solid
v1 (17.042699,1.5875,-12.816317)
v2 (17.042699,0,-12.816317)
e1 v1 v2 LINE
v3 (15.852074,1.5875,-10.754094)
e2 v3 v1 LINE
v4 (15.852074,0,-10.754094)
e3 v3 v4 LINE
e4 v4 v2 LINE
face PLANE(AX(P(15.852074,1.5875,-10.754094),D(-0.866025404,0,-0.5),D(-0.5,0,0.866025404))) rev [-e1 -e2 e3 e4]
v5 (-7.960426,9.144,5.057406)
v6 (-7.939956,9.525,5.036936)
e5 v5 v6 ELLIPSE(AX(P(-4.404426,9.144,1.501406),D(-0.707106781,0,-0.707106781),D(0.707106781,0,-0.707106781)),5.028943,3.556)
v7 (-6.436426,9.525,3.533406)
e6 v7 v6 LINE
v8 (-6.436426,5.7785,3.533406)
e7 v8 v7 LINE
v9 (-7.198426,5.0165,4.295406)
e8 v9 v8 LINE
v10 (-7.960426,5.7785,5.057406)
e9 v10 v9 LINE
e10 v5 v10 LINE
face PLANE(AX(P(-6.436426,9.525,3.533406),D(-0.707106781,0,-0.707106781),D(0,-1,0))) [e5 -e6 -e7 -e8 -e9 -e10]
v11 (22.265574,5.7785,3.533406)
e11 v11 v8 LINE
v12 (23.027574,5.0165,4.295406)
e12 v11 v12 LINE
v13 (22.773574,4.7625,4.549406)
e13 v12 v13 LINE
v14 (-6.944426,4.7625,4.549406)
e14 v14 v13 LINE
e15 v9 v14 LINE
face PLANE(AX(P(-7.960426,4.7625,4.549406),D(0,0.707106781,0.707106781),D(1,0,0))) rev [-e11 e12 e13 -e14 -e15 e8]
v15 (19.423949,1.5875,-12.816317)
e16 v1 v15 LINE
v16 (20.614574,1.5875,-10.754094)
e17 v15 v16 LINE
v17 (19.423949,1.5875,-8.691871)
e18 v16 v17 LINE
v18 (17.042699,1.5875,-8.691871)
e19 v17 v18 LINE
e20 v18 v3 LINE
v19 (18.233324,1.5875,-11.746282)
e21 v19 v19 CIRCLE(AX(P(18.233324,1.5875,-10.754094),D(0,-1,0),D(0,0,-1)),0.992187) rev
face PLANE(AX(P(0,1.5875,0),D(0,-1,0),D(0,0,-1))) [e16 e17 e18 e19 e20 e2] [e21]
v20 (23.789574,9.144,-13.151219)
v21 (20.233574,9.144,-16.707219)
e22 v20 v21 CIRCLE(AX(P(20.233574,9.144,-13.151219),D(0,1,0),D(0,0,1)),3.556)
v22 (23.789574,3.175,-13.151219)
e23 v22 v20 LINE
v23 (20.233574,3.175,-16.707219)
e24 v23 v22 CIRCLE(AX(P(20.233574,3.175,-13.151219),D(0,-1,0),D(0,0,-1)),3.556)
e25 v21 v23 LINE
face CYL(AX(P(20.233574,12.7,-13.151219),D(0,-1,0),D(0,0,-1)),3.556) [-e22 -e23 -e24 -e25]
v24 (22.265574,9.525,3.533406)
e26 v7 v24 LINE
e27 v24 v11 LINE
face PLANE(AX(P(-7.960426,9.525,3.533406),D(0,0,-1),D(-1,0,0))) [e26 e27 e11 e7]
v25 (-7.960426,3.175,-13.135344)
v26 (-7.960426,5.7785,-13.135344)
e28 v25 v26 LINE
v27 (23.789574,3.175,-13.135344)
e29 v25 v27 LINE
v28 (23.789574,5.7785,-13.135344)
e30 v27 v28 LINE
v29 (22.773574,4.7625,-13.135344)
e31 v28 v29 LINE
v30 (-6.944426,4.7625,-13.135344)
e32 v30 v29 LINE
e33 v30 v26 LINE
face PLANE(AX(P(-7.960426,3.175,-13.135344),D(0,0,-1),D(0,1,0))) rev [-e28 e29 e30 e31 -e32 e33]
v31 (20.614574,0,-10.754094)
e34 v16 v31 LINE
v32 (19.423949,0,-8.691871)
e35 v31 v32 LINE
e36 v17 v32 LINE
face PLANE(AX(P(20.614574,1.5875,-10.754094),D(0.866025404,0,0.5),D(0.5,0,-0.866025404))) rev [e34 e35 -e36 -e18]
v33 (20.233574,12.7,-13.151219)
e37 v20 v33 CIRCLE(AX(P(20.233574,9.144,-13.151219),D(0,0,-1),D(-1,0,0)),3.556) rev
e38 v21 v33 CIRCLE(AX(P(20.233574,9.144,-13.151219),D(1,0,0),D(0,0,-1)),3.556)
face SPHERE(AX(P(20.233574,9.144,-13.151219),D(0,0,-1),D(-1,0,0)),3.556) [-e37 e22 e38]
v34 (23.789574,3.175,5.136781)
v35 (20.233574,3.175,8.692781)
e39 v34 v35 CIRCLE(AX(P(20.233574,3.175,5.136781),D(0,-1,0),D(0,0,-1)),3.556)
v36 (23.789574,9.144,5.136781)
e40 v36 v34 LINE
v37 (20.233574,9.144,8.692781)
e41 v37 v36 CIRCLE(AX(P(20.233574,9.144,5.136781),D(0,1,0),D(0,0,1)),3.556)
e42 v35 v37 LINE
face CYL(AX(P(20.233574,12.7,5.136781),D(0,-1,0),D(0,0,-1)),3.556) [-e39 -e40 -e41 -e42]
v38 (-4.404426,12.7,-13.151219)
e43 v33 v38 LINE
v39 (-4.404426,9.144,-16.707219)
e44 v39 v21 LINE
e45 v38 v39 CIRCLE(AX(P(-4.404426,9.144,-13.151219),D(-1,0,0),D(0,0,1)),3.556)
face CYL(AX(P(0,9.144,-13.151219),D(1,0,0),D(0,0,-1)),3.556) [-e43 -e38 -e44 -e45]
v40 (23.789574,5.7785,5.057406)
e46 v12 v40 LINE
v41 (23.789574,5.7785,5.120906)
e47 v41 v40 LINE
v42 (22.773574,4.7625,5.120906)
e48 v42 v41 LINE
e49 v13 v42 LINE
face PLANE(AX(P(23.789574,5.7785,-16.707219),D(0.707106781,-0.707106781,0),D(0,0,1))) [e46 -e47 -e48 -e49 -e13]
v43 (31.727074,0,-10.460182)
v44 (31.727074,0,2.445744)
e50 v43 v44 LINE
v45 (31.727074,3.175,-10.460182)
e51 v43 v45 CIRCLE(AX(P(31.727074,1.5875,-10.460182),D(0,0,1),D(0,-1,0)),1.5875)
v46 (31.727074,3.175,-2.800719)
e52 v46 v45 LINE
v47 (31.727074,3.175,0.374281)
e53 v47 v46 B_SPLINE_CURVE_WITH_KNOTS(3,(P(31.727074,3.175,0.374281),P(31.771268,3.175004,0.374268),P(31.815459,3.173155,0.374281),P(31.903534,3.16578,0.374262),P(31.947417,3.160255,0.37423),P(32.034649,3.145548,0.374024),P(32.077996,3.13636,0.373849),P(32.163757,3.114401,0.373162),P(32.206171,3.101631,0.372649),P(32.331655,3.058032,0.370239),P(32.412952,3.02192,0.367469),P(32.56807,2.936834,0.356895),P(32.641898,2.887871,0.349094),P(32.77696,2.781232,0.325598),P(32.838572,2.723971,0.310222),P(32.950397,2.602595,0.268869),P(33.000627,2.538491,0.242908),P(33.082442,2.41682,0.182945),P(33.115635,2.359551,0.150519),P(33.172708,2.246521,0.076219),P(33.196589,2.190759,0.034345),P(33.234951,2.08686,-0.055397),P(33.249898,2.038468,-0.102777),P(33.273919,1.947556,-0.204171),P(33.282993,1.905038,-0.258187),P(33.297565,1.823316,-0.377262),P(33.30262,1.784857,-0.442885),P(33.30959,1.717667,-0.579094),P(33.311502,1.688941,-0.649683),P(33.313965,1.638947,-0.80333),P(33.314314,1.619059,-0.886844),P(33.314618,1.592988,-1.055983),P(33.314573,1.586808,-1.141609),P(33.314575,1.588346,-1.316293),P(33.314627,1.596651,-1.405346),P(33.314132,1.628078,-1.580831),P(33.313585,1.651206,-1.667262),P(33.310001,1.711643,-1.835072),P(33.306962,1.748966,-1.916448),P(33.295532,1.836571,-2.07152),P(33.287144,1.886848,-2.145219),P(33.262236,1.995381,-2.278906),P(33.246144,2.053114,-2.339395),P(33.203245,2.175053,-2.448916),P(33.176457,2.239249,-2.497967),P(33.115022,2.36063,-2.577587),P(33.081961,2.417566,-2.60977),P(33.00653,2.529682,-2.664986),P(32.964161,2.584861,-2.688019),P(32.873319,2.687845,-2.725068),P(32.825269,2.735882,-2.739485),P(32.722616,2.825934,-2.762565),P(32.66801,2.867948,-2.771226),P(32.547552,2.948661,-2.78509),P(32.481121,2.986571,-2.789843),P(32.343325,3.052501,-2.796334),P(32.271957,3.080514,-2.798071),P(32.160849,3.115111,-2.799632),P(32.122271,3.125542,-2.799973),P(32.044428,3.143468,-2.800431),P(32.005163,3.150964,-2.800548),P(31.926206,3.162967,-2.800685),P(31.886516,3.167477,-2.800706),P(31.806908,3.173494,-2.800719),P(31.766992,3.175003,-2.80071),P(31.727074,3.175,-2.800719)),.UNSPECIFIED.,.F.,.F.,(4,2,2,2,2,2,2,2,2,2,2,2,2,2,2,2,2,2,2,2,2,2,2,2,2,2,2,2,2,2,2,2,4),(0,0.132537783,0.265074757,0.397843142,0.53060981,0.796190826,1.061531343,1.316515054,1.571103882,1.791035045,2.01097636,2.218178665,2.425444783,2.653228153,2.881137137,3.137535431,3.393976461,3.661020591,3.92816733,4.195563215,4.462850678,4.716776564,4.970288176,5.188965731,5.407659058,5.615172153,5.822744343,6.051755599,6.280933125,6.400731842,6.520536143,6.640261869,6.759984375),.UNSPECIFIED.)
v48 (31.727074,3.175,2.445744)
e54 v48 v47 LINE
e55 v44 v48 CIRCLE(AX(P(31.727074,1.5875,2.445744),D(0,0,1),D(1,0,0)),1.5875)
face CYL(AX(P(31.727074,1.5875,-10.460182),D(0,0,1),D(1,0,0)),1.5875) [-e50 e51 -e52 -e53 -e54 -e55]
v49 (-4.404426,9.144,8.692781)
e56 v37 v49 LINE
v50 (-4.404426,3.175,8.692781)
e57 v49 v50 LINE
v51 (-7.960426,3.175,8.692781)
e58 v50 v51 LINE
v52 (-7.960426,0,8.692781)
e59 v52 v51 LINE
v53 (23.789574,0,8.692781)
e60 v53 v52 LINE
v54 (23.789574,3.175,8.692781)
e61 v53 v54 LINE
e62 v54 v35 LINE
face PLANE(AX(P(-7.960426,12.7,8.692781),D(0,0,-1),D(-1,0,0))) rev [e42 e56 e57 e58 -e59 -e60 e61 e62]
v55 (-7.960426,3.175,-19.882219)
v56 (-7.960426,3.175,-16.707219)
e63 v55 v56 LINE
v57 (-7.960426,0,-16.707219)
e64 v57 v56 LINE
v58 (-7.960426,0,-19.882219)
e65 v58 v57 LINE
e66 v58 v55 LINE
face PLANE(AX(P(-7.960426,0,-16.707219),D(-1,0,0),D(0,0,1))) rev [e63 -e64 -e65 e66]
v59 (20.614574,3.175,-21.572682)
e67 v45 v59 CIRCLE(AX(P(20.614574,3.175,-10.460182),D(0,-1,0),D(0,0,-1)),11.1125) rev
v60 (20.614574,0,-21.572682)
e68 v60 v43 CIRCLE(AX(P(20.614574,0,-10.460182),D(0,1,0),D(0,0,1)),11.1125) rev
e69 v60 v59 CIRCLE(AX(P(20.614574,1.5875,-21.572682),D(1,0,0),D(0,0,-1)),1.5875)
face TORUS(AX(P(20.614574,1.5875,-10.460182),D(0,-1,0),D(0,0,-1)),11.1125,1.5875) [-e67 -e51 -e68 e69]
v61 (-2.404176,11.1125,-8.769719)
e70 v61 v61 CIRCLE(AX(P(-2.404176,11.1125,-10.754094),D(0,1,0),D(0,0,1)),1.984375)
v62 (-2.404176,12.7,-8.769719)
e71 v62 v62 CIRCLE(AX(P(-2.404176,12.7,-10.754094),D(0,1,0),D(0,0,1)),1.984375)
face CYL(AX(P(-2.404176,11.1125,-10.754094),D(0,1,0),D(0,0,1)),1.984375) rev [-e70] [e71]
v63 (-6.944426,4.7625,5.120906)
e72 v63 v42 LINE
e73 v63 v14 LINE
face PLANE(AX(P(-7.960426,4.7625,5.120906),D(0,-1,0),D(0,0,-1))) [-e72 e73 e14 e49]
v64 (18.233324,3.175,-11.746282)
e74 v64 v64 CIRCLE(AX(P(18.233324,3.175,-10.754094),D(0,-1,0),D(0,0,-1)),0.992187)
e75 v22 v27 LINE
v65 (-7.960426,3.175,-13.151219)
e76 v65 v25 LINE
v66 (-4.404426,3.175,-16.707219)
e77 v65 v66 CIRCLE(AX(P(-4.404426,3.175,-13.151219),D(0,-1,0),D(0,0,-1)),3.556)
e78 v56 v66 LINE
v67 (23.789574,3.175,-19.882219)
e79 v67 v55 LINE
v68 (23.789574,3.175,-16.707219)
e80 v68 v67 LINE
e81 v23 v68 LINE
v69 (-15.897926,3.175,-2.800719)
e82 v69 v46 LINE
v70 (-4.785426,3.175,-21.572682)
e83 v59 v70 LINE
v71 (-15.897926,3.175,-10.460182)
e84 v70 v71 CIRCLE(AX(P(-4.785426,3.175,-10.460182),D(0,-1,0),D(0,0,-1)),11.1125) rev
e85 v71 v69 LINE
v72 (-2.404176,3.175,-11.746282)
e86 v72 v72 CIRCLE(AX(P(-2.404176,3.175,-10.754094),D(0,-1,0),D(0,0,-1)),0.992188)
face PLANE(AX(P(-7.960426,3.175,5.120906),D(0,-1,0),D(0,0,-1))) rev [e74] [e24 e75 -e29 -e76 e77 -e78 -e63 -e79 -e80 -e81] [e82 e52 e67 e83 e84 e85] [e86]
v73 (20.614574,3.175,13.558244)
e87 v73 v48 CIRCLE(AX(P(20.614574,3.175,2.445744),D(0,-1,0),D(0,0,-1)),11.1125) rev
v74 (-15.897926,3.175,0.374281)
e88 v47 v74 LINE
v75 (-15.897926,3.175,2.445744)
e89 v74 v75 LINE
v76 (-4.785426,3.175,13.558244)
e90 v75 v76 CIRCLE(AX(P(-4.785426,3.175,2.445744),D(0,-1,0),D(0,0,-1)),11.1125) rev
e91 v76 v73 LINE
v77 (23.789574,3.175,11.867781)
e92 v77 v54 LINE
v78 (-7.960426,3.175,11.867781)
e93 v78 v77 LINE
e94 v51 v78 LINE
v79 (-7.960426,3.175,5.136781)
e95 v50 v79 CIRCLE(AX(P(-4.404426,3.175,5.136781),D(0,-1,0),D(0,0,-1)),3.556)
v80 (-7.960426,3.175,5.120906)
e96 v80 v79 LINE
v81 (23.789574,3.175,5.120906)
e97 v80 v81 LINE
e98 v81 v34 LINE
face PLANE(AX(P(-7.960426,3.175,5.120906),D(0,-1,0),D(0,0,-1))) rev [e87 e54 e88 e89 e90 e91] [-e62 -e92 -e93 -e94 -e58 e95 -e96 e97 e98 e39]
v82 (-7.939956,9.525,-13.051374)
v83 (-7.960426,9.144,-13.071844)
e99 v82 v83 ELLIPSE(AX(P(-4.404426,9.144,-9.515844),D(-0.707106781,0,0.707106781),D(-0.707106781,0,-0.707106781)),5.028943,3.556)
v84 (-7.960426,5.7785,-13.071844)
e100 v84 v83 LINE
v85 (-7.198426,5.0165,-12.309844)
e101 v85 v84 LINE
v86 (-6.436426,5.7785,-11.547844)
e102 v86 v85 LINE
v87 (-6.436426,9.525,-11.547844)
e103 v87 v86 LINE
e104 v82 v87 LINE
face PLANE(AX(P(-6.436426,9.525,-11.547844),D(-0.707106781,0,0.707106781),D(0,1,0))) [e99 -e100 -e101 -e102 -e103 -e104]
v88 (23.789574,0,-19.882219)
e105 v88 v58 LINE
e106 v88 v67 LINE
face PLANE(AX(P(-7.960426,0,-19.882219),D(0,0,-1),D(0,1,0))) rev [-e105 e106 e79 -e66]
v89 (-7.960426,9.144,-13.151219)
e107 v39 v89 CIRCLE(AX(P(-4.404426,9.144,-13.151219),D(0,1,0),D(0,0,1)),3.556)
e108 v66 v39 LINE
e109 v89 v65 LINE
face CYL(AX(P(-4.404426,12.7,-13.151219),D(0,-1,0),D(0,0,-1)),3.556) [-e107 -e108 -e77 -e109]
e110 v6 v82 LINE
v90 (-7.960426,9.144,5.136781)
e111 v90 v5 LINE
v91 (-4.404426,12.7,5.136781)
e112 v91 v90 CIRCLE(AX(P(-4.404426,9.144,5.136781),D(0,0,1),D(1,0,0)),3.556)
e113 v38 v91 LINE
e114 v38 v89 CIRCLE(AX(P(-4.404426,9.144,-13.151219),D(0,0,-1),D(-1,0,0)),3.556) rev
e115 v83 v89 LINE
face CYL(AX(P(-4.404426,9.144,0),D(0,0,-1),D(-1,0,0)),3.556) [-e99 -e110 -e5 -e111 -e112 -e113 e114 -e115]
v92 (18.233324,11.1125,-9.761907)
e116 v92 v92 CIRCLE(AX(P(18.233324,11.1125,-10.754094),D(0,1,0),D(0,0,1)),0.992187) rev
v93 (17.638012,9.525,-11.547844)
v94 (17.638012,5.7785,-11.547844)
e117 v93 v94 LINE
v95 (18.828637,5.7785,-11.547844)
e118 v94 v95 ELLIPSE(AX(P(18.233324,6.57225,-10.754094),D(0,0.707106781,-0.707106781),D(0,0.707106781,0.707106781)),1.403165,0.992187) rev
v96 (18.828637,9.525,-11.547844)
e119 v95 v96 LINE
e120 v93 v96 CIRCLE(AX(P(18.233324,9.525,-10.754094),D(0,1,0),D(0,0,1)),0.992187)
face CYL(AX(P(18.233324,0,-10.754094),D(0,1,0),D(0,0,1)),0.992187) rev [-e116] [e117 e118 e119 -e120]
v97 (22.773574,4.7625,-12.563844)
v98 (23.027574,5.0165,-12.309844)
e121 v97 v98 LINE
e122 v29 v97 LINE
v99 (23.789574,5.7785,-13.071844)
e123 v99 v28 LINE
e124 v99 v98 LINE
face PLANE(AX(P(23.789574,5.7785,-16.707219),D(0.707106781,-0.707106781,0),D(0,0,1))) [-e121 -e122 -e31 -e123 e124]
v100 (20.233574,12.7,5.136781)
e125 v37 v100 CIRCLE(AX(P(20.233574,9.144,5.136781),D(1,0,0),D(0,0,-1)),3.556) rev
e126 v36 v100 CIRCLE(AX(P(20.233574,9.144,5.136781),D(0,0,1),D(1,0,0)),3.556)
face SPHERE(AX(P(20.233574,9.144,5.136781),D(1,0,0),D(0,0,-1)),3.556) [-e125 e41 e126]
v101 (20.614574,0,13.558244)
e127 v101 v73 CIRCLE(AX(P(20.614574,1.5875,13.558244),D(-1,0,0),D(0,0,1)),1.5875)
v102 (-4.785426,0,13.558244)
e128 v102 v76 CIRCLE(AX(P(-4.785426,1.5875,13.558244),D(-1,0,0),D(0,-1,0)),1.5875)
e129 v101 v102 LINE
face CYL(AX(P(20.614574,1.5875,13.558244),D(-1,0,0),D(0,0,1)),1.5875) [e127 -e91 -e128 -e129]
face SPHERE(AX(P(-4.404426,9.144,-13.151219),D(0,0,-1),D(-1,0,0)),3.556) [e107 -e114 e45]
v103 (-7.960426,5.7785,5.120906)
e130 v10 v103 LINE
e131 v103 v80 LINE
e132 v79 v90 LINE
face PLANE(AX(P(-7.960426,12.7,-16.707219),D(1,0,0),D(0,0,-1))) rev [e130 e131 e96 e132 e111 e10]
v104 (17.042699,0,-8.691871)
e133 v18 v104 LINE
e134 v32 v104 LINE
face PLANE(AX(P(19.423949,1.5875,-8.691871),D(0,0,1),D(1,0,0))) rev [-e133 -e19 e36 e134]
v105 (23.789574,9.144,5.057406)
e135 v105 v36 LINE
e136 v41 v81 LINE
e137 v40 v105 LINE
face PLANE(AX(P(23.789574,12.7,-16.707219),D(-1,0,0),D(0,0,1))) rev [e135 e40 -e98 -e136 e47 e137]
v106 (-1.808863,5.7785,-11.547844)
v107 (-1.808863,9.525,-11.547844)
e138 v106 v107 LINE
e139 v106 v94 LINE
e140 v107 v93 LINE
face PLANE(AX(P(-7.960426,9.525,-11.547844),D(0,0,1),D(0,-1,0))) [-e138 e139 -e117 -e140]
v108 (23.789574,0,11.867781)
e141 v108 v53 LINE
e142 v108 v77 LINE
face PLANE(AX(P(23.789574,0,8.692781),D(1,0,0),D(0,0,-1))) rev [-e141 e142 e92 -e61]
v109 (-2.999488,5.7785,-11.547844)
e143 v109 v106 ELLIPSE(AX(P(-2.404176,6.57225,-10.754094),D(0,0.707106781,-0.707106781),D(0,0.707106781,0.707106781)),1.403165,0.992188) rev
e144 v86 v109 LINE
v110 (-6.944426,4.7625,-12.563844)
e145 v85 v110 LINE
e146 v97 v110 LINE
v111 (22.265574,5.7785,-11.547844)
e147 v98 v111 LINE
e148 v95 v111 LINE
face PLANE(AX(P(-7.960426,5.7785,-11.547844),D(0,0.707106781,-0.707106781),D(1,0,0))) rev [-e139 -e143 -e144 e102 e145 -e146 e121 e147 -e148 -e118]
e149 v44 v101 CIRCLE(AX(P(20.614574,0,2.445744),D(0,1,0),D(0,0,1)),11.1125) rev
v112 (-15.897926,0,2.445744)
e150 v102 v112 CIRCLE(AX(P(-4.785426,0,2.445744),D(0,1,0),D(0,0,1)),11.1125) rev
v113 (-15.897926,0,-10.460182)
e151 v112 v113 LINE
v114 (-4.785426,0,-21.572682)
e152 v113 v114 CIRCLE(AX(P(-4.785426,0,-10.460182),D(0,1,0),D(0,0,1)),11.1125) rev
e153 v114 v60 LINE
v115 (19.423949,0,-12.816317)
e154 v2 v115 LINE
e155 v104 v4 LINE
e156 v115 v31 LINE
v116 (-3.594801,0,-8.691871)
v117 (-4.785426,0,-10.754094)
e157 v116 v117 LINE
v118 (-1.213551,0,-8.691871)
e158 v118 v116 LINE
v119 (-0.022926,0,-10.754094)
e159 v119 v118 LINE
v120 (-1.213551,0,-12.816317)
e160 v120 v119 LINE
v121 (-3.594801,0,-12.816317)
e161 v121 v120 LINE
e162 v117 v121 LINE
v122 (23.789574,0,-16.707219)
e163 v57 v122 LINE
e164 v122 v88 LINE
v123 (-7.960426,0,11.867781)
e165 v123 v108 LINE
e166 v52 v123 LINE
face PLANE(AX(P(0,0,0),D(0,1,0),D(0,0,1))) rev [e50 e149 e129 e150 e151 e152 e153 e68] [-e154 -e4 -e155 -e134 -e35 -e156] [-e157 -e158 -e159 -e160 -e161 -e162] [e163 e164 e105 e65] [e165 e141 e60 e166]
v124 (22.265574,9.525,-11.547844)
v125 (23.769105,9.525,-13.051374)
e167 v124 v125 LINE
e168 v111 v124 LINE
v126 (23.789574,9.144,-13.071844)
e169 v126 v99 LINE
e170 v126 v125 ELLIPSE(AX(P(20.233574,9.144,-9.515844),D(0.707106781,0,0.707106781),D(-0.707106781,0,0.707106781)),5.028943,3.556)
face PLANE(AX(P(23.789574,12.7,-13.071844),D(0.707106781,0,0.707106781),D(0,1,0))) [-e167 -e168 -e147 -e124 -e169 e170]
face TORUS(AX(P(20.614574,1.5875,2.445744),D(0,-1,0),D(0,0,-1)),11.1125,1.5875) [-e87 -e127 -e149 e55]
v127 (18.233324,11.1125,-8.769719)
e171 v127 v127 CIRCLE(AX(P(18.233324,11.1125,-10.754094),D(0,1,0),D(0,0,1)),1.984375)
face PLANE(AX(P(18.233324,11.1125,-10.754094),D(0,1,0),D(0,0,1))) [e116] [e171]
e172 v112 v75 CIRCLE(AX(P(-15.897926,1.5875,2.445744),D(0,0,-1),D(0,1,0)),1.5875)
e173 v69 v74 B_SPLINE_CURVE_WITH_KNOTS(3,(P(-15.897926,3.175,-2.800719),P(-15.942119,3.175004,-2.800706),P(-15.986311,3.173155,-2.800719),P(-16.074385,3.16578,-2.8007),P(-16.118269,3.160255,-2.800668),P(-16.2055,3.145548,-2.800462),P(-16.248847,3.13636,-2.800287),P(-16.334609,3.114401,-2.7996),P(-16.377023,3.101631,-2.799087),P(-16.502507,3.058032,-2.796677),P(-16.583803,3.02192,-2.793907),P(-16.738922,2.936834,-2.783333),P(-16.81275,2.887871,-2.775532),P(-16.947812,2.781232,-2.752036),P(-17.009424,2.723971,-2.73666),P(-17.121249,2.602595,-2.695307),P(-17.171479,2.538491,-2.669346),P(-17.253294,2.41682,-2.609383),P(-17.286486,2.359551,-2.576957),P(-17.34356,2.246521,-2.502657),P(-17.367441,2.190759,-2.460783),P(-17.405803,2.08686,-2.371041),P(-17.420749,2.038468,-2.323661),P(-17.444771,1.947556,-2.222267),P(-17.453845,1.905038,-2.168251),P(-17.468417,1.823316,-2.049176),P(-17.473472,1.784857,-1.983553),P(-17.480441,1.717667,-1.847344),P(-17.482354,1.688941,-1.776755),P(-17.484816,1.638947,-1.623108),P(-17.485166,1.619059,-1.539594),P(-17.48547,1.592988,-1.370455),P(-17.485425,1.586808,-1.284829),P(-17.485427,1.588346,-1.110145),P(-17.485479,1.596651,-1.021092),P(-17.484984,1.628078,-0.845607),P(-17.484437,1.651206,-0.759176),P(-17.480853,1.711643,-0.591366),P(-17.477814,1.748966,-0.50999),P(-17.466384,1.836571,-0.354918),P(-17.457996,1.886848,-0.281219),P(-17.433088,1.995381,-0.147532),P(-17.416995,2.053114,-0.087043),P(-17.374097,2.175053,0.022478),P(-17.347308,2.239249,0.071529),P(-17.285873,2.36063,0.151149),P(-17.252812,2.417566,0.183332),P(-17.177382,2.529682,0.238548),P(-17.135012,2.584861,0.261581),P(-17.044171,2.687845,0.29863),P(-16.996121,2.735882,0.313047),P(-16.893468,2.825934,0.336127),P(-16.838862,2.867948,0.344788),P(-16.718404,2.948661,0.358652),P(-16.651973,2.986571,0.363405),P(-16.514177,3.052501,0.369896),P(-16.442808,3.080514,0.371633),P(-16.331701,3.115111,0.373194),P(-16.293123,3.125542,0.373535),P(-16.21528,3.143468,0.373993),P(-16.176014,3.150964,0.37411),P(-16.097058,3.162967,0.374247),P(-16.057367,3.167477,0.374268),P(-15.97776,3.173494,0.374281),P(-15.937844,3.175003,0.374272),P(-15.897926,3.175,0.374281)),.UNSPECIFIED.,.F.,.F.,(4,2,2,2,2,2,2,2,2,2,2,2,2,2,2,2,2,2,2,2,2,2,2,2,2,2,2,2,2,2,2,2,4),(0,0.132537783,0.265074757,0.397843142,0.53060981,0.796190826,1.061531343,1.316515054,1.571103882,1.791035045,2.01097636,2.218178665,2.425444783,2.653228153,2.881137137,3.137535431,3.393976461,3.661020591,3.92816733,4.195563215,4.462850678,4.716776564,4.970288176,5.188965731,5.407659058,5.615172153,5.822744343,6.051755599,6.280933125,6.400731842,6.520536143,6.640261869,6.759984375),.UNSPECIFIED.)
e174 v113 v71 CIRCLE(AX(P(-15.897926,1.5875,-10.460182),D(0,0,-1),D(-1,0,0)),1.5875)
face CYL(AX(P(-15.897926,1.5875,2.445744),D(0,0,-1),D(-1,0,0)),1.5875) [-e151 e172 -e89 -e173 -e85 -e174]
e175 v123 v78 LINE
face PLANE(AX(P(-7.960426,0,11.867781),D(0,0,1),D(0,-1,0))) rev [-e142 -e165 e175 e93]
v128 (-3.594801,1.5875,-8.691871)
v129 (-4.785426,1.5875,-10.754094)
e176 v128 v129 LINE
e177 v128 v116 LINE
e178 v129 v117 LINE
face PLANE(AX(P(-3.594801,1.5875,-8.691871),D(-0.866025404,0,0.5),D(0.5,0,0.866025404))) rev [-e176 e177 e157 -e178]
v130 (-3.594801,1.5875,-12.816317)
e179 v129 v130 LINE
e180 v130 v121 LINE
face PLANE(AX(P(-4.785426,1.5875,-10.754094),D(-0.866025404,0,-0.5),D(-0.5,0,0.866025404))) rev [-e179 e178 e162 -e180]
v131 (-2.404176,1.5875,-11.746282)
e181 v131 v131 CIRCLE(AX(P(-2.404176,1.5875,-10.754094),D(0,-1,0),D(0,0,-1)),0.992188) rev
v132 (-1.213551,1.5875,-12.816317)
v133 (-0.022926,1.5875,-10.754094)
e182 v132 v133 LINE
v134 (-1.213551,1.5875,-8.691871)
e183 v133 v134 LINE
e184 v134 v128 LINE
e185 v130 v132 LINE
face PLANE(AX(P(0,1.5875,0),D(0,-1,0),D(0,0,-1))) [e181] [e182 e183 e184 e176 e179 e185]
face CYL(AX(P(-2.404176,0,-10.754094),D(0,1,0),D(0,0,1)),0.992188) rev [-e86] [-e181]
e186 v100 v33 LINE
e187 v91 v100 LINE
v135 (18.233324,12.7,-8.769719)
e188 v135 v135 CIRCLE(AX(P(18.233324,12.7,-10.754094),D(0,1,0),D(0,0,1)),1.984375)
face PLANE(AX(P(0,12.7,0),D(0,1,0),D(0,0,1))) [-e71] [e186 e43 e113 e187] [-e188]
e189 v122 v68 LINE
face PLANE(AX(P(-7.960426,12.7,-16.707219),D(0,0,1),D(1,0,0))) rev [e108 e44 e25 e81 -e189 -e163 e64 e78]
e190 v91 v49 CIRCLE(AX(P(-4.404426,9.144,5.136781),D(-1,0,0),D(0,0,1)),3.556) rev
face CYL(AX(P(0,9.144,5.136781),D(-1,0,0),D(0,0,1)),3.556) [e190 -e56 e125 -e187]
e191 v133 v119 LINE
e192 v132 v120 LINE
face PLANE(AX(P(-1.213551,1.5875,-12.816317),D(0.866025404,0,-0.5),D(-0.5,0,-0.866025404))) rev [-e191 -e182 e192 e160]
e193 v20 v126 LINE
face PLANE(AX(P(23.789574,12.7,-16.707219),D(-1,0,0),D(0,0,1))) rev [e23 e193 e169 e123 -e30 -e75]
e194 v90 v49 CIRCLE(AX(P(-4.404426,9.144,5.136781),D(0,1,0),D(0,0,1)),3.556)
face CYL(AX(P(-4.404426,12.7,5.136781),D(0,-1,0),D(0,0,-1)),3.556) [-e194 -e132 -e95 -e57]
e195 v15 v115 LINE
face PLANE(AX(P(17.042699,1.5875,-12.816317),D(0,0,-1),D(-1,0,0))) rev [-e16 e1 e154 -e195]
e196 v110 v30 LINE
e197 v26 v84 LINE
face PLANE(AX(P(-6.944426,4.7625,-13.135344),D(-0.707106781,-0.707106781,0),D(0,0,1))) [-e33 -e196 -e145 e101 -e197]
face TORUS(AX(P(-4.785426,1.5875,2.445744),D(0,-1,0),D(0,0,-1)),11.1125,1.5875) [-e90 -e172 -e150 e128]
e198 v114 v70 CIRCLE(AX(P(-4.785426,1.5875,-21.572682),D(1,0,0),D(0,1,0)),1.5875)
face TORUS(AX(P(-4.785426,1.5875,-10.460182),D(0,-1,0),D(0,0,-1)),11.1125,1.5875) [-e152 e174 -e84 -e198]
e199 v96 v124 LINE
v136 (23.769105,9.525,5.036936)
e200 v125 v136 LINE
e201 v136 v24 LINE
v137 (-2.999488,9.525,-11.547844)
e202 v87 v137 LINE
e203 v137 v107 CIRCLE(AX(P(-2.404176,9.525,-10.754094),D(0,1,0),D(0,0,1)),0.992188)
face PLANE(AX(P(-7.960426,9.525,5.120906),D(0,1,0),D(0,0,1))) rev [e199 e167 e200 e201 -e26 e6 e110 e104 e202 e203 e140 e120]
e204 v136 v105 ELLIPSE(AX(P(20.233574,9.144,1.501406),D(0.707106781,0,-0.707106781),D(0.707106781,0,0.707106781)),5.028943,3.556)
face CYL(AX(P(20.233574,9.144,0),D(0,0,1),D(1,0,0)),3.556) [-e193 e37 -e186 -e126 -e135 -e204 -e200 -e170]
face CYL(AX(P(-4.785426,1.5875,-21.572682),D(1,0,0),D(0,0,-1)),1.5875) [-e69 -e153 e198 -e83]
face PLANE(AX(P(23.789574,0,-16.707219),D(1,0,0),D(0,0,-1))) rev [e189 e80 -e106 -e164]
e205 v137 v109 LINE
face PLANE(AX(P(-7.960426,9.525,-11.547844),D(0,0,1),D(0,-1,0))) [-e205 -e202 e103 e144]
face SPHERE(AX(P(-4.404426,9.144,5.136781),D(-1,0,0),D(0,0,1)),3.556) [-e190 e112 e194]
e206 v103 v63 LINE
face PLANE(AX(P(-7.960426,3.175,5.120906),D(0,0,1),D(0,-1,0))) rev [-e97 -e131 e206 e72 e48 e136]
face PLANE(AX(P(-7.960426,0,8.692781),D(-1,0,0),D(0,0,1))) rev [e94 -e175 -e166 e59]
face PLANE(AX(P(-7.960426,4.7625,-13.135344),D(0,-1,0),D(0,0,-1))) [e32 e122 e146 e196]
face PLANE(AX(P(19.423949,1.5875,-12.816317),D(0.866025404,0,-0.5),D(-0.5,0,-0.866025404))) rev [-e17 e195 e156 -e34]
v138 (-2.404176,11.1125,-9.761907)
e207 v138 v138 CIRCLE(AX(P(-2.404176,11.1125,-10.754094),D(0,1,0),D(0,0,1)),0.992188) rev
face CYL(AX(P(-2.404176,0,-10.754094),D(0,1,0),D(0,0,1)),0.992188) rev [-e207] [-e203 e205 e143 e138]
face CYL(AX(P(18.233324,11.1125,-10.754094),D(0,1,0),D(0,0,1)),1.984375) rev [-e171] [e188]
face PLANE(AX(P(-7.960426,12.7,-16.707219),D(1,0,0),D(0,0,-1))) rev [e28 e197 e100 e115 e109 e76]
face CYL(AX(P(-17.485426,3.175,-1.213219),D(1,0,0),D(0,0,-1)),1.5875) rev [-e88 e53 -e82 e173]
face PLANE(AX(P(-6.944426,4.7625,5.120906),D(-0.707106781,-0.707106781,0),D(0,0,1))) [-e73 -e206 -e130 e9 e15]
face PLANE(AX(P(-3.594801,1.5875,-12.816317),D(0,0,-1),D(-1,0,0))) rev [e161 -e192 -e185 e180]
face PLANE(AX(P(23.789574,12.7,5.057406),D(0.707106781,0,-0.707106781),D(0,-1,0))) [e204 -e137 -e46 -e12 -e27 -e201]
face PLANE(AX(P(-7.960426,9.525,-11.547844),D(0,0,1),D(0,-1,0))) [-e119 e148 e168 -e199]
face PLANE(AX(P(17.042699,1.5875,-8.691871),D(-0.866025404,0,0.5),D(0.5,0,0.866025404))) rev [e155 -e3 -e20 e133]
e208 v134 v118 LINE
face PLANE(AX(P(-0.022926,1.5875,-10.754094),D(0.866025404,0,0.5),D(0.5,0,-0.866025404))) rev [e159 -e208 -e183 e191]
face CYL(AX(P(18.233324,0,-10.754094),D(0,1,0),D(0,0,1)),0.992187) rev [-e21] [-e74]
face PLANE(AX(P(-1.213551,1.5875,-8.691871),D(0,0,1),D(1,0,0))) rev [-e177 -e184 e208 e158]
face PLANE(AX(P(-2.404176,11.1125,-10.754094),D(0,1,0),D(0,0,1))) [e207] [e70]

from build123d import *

# Parameters (mm, degrees)
SKETCH1_W               = 31.75
SKETCH1_H               = 25.4
BOSS_EXTRUDE1_DEPTH     = 12.7
SKETCH2_W               = 18.25625
SKETCH2_H               = 6.35
CUT_EXTRUDE3_DEPTH      = 39.058949894
SKETCH4_W               = 1.5875
SKETCH4_H               = 4.7625
BOSS_EXTRUDE2_DEPTH     = 31.75
CUT_EXTRUDE5_DEPTH      = 31.590858593
CUT_EXTRUDE5_DEPTH_BACK = 31.590858593
SKETCH5_R               = 0.9921875
CUT_EXTRUDE6_DEPTH      = 1.5875
SKETCH7_R               = 1.984375
CUT_EXTRUDE7_DEPTH      = 1.5875
SKETCH8_W               = 50.8
SKETCH8_H               = 38.305926372
SKETCH8_W_2             = 31.75
SKETCH8_H_2             = 25.4
BOSS_EXTRUDE3_DEPTH     = 3.175
SKETCH10_W              = 31.75
SKETCH10_H              = 3.175
CUT_EXTRUDE8_DEPTH      = 42.677098196
FILLET6_R               = 12.7
CHAMFER1_SIZE           = 1.016
CHAMFER2_SIZE           = 1.524
FILLET7_R               = 3.556
FILLET10_R              = 1.5875
SKETCH13_R              = 1.5875
CUT_EXTRUDE9_DEPTH      = 74.216005252


# Some blends are built 0.0001 mm under size
with BuildPart() as part:
    # Sketch1 → Boss-Extrude1 (new body)
    with BuildSketch(Plane(origin=(0, 0, 0), x_dir=(1, 0, 0), z_dir=(0, 1, 0))):
        with Locations((7.914574134, 4.007219009)):
            Rectangle(SKETCH1_W, SKETCH1_H)
    extrude(amount=BOSS_EXTRUDE1_DEPTH)

    # Sketch2 → Cut-Extrude3 (cut, through all)
    with BuildSketch(Plane(origin=(23.789574134, 0, 0), x_dir=(0, 0, -1), z_dir=(1, 0, 0))):
        with Locations((4.007219009, 6.35)):
            Rectangle(SKETCH2_W, SKETCH2_H)
    extrude(amount=-CUT_EXTRUDE3_DEPTH, mode=Mode.SUBTRACT)

    # Sketch4 → Boss-Extrude2 (add, through all)
    with BuildSketch(Plane(origin=(23.789574134, 0, 0), x_dir=(0, 0, -1), z_dir=(1, 0, 0))):
        with Locations((-4.327155991, 7.14375)):
            Rectangle(SKETCH4_W, SKETCH4_H)
        with Locations((12.341594009, 7.14375)):
            Rectangle(SKETCH4_W, SKETCH4_H)
    extrude(amount=-BOSS_EXTRUDE2_DEPTH)

    # Sketch5 → Cut-Extrude5 (cut, two sides: drawn at the far end of the back side and taken through both)
    with BuildSketch(Plane(origin=(0, 3.175, 0), x_dir=(1, 0, 0), z_dir=(0, 1, 0)).offset(-CUT_EXTRUDE5_DEPTH_BACK)):
        with Locations(Location((-2.404175866, 10.754094009, 0), (0, 0, 270))):
            Circle(SKETCH5_R)
        with Locations(Location((18.233324134, 10.754094009, 0), (0, 0, 126.869897646))):
            Circle(SKETCH5_R)
    extrude(amount=CUT_EXTRUDE5_DEPTH + CUT_EXTRUDE5_DEPTH_BACK, mode=Mode.SUBTRACT)

    # Sketch6 → Cut-Extrude6 (cut)
    with BuildSketch(Plane.XZ):
        Polygon((-0.022925866, -10.754094009), (-1.213550866, -8.691871016), (-3.594800866, -8.691871016), (-4.785425866, -10.754094009), (-3.594800866, -12.816317002), (-1.213550866, -12.816317002), align=None)
        Polygon((20.614574134, -10.754094009), (19.423949134, -8.691871016), (17.042699134, -8.691871016), (15.852074134, -10.754094009), (17.042699134, -12.816317002), (19.423949134, -12.816317002), align=None)
    extrude(amount=-CUT_EXTRUDE6_DEPTH, mode=Mode.SUBTRACT)

    # Sketch7 → Cut-Extrude7 (cut)
    with BuildSketch(Plane(origin=(0, 12.7, 0), x_dir=(1, 0, 0), z_dir=(0, 1, 0))):
        with Locations(Location((-2.404175866, 10.754094009, 0), (0, 0, 270))):
            Circle(SKETCH7_R)
        with Locations(Location((18.233324134, 10.754094009, 0), (0, 0, 270))):
            Circle(SKETCH7_R)
    extrude(amount=-CUT_EXTRUDE7_DEPTH, mode=Mode.SUBTRACT)

    # Sketch8 → Boss-Extrude3 (add)
    with BuildSketch(Plane.XZ):
        with Locations((7.914574134, -4.007219009)):
            Rectangle(SKETCH8_W, SKETCH8_H)
        with Locations((7.914574134, -4.007219009)):
            Rectangle(SKETCH8_W_2, SKETCH8_H_2, mode=Mode.SUBTRACT)
    extrude(amount=-BOSS_EXTRUDE3_DEPTH)

    # Sketch10 → Cut-Extrude8 (cut, through all)
    with BuildSketch(Plane(origin=(0, 3.175, 0), x_dir=(1, 0, 0), z_dir=(0, 1, 0))):
        with Locations((7.914574134, 18.294719009)):
            Rectangle(SKETCH10_W, SKETCH10_H)
        with Locations((7.914574134, -10.280280991)):
            Rectangle(SKETCH10_W, SKETCH10_H)
    extrude(amount=-CUT_EXTRUDE8_DEPTH, mode=Mode.SUBTRACT)

    # Fillet6
    fillet6_edges = [part.edges().sort_by_distance(p)[0] for p in [
        (-17.485425866, 1.5875, 15.145744177),
        (33.314574134, 1.5875, 15.145744177),
        (33.314574134, 1.5875, -23.160182195),
        (-17.485425866, 1.5875, -23.160182195),
    ]]
    fillet(fillet6_edges, radius=FILLET6_R)

    # Chamfer1
    # the kernel refuses this chamfer: 1.016 mm, written as the material it takes off along each edge
    with BuildSketch(Plane(origin=(-7.960425866, 4.7625, 0.920576075), x_dir=(-0.027495876610586435, 0.9996219169112968, 0), z_dir=(0, 0, 1)), Plane(origin=(-7.960425866, 4.7625, -13.135344009), x_dir=(-0.027495876610586435, 0.9996219169112968, 1.1185418764848949e-15), z_dir=(0, 0, 1))) as chamfer1_piece_1:
        Polygon((CHAMFER1_SIZE * 0.999621916911, -CHAMFER1_SIZE * 0.0274958766106), (-CHAMFER1_SIZE * 0.0274958766106, -CHAMFER1_SIZE * 0.999621916911), (0, 0), align=None)
    extrude(amount=4.200329916, mode=Mode.SUBTRACT)
    with BuildSketch(Plane(origin=(26.402404049, 4.7625, 3.533405991), x_dir=(0, 0.9996219169112968, -0.027495876610586435), z_dir=(-1, 0, 0))) as chamfer1_piece_2:
        Polygon((CHAMFER1_SIZE * 0.999621916911, -CHAMFER1_SIZE * 0.0274958766106), (-CHAMFER1_SIZE * 0.0274958766106, -CHAMFER1_SIZE * 0.999621916911), (0, 0), align=None)
    extrude(amount=36.975659832, mode=Mode.SUBTRACT)
    with BuildSketch(Plane(origin=(23.789574134, 4.7625, 0.920576075), x_dir=(0.027495876610587285, 0.9996219169112968, 0), z_dir=(0, 0, 1)), Plane(origin=(23.789574134, 4.7625, -13.135344009), x_dir=(0.027495876610587285, 0.9996219169112968, 1.1185418764848949e-15), z_dir=(0, 0, 1))) as chamfer1_piece_3:
        Polygon((CHAMFER1_SIZE * 0.999621916911, CHAMFER1_SIZE * 0.0274958766106), (-CHAMFER1_SIZE * 0.0274958766106, CHAMFER1_SIZE * 0.999621916911), (0, 0), align=None)
    extrude(amount=4.200329916, mode=Mode.SUBTRACT)
    with BuildSketch(Plane(origin=(-0.386658451, 4.7625, -11.547844009), x_dir=(0, -0.027495876610585605, -0.9996219169112968), z_dir=(-1, 0, 0)), Plane(origin=(26.402404049, 4.7625, -11.547844009), x_dir=(0, -0.027495876610585605, -0.9996219169112968), z_dir=(-1, 0, 0))) as chamfer1_piece_4:
        Polygon((CHAMFER1_SIZE * 0.999621916911, -CHAMFER1_SIZE * 0.0274958766106), (-CHAMFER1_SIZE * 0.0274958766106, -CHAMFER1_SIZE * 0.999621916911), (0, 0), align=None)
    extrude(amount=10.186597332, mode=Mode.SUBTRACT)
    with BuildSketch(Plane(origin=(20.250841549, 4.7625, -11.547844009), x_dir=(0, -0.027495876610585605, -0.9996219169112968), z_dir=(-1, 0, 0))) as chamfer1_piece_5:
        Polygon((CHAMFER1_SIZE * 0.999621916911, -CHAMFER1_SIZE * 0.0274958766106), (-CHAMFER1_SIZE * 0.0274958766106, -CHAMFER1_SIZE * 0.999621916911), (0, 0), align=None)
    extrude(amount=24.672534832, mode=Mode.SUBTRACT)

    # Chamfer2
    chamfer2_edges = [part.edges().sort_by_distance(p)[0] for p in [
        (-7.960425866, 7.65175, 3.533405991),
        (23.789574134, 7.65175, 3.533405991),
        (-7.960425866, 7.65175, -11.547844009),
        (23.789574134, 7.65175, -11.547844009),
    ]]
    chamfer(chamfer2_edges, length=CHAMFER2_SIZE)

    # Fillet7
    # the kernel refuses this fillet: 3.556 mm, written as the material it takes off along each edge
    with BuildSketch(Plane(origin=(20.233574134, 9.144, 5.136780991), x_dir=(0, 0, 1), z_dir=(1, 0, 0))) as fillet7_piece_1_section:
        Polygon((0, 0), (FILLET7_R * 1.02, 0), (FILLET7_R * 1.02, -FILLET7_R * 1.02), (0, -FILLET7_R * 1.02), align=None)
    fillet7_piece_1 = extrude(amount=FILLET7_R * 1.02, mode=Mode.PRIVATE)
    fillet7_piece_1 = fillet7_piece_1 - Plane(origin=(20.233574134, 9.144, 5.136780991), x_dir=(0, -0.7071067811865475, -0.7071067811865475), z_dir=(1, 0, 0)) * Sphere(FILLET7_R, mode=Mode.PRIVATE)
    add(fillet7_piece_1, mode=Mode.SUBTRACT)
    with BuildSketch(Plane(origin=(-4.404425866, 9.144, 5.136780991), x_dir=(0, 0, 1), z_dir=(-1, 0, 0))) as fillet7_piece_2_section:
        Polygon((0, 0), (FILLET7_R * 1.02, 0), (FILLET7_R * 1.02, FILLET7_R * 1.02), (0, FILLET7_R * 1.02), align=None)
    fillet7_piece_2 = extrude(amount=FILLET7_R * 1.02, mode=Mode.PRIVATE)
    fillet7_piece_2 = fillet7_piece_2 - Plane(origin=(-4.404425866, 9.144, 5.136780991), x_dir=(0, -0.7071067811865475, -0.7071067811865475), z_dir=(-1, 0, 0)) * Sphere(FILLET7_R, mode=Mode.PRIVATE)
    add(fillet7_piece_2, mode=Mode.SUBTRACT)
    with BuildSketch(Plane(origin=(20.233574134, 9.144, -13.151219009), x_dir=(1, 0, 0), z_dir=(0, 0, -1))) as fillet7_piece_3_section:
        Polygon((0, 0), (FILLET7_R * 1.02, 0), (FILLET7_R * 1.02, -FILLET7_R * 1.02), (0, -FILLET7_R * 1.02), align=None)
    fillet7_piece_3 = extrude(amount=FILLET7_R * 1.02, mode=Mode.PRIVATE)
    fillet7_piece_3 = fillet7_piece_3 - Plane(origin=(20.233574134, 9.144, -13.151219009), x_dir=(-0.7071067811865475, -0.7071067811865475, 0), z_dir=(0, 0, -1)) * Sphere(FILLET7_R, mode=Mode.PRIVATE)
    add(fillet7_piece_3, mode=Mode.SUBTRACT)
    with BuildSketch(Plane(origin=(-4.404425866, 9.144, -13.151219009), x_dir=(-1, 0, 0), z_dir=(0, 0, -1))) as fillet7_piece_4_section:
        Polygon((0, 0), (FILLET7_R * 1.02, 0), (FILLET7_R * 1.02, FILLET7_R * 1.02), (0, FILLET7_R * 1.02), align=None)
    fillet7_piece_4 = extrude(amount=FILLET7_R * 1.02, mode=Mode.PRIVATE)
    fillet7_piece_4 = fillet7_piece_4 - Plane(origin=(-4.404425866, 9.144, -13.151219009), x_dir=(0.7071067811865475, -0.7071067811865475, 0), z_dir=(0, 0, -1)) * Sphere(FILLET7_R, mode=Mode.PRIVATE)
    add(fillet7_piece_4, mode=Mode.SUBTRACT)
    with BuildSketch(Plane(origin=(20.233574134, 12.7, 8.692780991), x_dir=(0, -1, 0), z_dir=(-1, 0, 0))) as fillet7_piece_5:
        with BuildLine():
            CenterArc((FILLET7_R, -FILLET7_R), FILLET7_R, 90, 90)
            Line((0, -FILLET7_R), (0, 0))
            Line((0, 0), (FILLET7_R, 0))
        make_face()
    extrude(amount=24.638, mode=Mode.SUBTRACT)
    with BuildSketch(Plane(origin=(23.789574134, 3.175, 8.692780991), x_dir=(-1, 0, 0), z_dir=(0, 1, 0)), Plane(origin=(-7.960425866, 3.175, -16.707219009), x_dir=(1, 0, 0), z_dir=(0, 1, 0))) as fillet7_piece_6:
        with BuildLine():
            CenterArc((FILLET7_R, -FILLET7_R), FILLET7_R, 90, 90)
            Line((0, -FILLET7_R), (0, 0))
            Line((0, 0), (FILLET7_R, 0))
        make_face()
    extrude(amount=5.969, mode=Mode.SUBTRACT)
    with BuildSketch(Plane(origin=(23.789574134, 12.7, -13.151219009), x_dir=(-1, 0, 0), z_dir=(0, 0, 1)), Plane(origin=(-7.960425866, 12.7, 5.136780991), x_dir=(1, 0, 0), z_dir=(0, 0, -1))) as fillet7_piece_7:
        with BuildLine():
            CenterArc((FILLET7_R, FILLET7_R), FILLET7_R, 180, 90)
            Line((0, FILLET7_R), (0, 0))
            Line((0, 0), (FILLET7_R, 0))
        make_face()
    extrude(amount=18.288, mode=Mode.SUBTRACT)
    with BuildSketch(Plane(origin=(23.789574134, 3.175, -16.707219009), x_dir=(-1, 0, 0), z_dir=(0, 1, 0)), Plane(origin=(-7.960425866, 3.175, 8.692780991), x_dir=(1, 0, 0), z_dir=(0, 1, 0))) as fillet7_piece_8:
        with BuildLine():
            CenterArc((FILLET7_R, FILLET7_R), FILLET7_R, 180, 90)
            Line((0, FILLET7_R), (0, 0))
            Line((0, 0), (FILLET7_R, 0))
        make_face()
    extrude(amount=5.969, mode=Mode.SUBTRACT)
    with BuildSketch(Plane(origin=(-4.404425866, 12.7, -16.707219009), x_dir=(0, 0, 1), z_dir=(1, 0, 0))) as fillet7_piece_9:
        with BuildLine():
            CenterArc((FILLET7_R, FILLET7_R), FILLET7_R, 180, 90)
            Line((0, FILLET7_R), (0, 0))
            Line((0, 0), (FILLET7_R, 0))
        make_face()
    extrude(amount=24.638, mode=Mode.SUBTRACT)

    # Fillet10
    fillet10_edges = [part.edges().sort_by_distance(p)[0] for p in [
        (7.914574134, 3.175, 15.145744177),
        (7.914574134, 0, 15.145744177),
        (-17.485425866, 0, -4.007219009),
        (7.914574134, 0, -23.160182195),
        (33.314574134, 0, -4.007219009),
        (29.594830255, 0, 11.426000298),
        (29.594830255, 0, -19.440438316),
        (-13.765681988, 0, -19.440438316),
        (-13.765681988, 0, 11.426000298),
        (-17.485425866, 3.175, -4.007219009),
        (33.314574134, 3.175, -4.007219009),
        (7.914574134, 3.175, -23.160182195),
    ]]
    fillet(fillet10_edges, radius=FILLET10_R - 0.0001)  # a hair under: the kernel refuses the full size

    # Sketch13 → Cut-Extrude9 (cut, through all)
    with BuildSketch(Plane(origin=(50.8, 0, 0), x_dir=(0, 0, -1), z_dir=(1, 0, 0))):
        with Locations((1.213219009, 3.175)):
            Circle(SKETCH13_R)
    extrude(amount=-CUT_EXTRUDE9_DEPTH, mode=Mode.SUBTRACT)


solid = part.part
